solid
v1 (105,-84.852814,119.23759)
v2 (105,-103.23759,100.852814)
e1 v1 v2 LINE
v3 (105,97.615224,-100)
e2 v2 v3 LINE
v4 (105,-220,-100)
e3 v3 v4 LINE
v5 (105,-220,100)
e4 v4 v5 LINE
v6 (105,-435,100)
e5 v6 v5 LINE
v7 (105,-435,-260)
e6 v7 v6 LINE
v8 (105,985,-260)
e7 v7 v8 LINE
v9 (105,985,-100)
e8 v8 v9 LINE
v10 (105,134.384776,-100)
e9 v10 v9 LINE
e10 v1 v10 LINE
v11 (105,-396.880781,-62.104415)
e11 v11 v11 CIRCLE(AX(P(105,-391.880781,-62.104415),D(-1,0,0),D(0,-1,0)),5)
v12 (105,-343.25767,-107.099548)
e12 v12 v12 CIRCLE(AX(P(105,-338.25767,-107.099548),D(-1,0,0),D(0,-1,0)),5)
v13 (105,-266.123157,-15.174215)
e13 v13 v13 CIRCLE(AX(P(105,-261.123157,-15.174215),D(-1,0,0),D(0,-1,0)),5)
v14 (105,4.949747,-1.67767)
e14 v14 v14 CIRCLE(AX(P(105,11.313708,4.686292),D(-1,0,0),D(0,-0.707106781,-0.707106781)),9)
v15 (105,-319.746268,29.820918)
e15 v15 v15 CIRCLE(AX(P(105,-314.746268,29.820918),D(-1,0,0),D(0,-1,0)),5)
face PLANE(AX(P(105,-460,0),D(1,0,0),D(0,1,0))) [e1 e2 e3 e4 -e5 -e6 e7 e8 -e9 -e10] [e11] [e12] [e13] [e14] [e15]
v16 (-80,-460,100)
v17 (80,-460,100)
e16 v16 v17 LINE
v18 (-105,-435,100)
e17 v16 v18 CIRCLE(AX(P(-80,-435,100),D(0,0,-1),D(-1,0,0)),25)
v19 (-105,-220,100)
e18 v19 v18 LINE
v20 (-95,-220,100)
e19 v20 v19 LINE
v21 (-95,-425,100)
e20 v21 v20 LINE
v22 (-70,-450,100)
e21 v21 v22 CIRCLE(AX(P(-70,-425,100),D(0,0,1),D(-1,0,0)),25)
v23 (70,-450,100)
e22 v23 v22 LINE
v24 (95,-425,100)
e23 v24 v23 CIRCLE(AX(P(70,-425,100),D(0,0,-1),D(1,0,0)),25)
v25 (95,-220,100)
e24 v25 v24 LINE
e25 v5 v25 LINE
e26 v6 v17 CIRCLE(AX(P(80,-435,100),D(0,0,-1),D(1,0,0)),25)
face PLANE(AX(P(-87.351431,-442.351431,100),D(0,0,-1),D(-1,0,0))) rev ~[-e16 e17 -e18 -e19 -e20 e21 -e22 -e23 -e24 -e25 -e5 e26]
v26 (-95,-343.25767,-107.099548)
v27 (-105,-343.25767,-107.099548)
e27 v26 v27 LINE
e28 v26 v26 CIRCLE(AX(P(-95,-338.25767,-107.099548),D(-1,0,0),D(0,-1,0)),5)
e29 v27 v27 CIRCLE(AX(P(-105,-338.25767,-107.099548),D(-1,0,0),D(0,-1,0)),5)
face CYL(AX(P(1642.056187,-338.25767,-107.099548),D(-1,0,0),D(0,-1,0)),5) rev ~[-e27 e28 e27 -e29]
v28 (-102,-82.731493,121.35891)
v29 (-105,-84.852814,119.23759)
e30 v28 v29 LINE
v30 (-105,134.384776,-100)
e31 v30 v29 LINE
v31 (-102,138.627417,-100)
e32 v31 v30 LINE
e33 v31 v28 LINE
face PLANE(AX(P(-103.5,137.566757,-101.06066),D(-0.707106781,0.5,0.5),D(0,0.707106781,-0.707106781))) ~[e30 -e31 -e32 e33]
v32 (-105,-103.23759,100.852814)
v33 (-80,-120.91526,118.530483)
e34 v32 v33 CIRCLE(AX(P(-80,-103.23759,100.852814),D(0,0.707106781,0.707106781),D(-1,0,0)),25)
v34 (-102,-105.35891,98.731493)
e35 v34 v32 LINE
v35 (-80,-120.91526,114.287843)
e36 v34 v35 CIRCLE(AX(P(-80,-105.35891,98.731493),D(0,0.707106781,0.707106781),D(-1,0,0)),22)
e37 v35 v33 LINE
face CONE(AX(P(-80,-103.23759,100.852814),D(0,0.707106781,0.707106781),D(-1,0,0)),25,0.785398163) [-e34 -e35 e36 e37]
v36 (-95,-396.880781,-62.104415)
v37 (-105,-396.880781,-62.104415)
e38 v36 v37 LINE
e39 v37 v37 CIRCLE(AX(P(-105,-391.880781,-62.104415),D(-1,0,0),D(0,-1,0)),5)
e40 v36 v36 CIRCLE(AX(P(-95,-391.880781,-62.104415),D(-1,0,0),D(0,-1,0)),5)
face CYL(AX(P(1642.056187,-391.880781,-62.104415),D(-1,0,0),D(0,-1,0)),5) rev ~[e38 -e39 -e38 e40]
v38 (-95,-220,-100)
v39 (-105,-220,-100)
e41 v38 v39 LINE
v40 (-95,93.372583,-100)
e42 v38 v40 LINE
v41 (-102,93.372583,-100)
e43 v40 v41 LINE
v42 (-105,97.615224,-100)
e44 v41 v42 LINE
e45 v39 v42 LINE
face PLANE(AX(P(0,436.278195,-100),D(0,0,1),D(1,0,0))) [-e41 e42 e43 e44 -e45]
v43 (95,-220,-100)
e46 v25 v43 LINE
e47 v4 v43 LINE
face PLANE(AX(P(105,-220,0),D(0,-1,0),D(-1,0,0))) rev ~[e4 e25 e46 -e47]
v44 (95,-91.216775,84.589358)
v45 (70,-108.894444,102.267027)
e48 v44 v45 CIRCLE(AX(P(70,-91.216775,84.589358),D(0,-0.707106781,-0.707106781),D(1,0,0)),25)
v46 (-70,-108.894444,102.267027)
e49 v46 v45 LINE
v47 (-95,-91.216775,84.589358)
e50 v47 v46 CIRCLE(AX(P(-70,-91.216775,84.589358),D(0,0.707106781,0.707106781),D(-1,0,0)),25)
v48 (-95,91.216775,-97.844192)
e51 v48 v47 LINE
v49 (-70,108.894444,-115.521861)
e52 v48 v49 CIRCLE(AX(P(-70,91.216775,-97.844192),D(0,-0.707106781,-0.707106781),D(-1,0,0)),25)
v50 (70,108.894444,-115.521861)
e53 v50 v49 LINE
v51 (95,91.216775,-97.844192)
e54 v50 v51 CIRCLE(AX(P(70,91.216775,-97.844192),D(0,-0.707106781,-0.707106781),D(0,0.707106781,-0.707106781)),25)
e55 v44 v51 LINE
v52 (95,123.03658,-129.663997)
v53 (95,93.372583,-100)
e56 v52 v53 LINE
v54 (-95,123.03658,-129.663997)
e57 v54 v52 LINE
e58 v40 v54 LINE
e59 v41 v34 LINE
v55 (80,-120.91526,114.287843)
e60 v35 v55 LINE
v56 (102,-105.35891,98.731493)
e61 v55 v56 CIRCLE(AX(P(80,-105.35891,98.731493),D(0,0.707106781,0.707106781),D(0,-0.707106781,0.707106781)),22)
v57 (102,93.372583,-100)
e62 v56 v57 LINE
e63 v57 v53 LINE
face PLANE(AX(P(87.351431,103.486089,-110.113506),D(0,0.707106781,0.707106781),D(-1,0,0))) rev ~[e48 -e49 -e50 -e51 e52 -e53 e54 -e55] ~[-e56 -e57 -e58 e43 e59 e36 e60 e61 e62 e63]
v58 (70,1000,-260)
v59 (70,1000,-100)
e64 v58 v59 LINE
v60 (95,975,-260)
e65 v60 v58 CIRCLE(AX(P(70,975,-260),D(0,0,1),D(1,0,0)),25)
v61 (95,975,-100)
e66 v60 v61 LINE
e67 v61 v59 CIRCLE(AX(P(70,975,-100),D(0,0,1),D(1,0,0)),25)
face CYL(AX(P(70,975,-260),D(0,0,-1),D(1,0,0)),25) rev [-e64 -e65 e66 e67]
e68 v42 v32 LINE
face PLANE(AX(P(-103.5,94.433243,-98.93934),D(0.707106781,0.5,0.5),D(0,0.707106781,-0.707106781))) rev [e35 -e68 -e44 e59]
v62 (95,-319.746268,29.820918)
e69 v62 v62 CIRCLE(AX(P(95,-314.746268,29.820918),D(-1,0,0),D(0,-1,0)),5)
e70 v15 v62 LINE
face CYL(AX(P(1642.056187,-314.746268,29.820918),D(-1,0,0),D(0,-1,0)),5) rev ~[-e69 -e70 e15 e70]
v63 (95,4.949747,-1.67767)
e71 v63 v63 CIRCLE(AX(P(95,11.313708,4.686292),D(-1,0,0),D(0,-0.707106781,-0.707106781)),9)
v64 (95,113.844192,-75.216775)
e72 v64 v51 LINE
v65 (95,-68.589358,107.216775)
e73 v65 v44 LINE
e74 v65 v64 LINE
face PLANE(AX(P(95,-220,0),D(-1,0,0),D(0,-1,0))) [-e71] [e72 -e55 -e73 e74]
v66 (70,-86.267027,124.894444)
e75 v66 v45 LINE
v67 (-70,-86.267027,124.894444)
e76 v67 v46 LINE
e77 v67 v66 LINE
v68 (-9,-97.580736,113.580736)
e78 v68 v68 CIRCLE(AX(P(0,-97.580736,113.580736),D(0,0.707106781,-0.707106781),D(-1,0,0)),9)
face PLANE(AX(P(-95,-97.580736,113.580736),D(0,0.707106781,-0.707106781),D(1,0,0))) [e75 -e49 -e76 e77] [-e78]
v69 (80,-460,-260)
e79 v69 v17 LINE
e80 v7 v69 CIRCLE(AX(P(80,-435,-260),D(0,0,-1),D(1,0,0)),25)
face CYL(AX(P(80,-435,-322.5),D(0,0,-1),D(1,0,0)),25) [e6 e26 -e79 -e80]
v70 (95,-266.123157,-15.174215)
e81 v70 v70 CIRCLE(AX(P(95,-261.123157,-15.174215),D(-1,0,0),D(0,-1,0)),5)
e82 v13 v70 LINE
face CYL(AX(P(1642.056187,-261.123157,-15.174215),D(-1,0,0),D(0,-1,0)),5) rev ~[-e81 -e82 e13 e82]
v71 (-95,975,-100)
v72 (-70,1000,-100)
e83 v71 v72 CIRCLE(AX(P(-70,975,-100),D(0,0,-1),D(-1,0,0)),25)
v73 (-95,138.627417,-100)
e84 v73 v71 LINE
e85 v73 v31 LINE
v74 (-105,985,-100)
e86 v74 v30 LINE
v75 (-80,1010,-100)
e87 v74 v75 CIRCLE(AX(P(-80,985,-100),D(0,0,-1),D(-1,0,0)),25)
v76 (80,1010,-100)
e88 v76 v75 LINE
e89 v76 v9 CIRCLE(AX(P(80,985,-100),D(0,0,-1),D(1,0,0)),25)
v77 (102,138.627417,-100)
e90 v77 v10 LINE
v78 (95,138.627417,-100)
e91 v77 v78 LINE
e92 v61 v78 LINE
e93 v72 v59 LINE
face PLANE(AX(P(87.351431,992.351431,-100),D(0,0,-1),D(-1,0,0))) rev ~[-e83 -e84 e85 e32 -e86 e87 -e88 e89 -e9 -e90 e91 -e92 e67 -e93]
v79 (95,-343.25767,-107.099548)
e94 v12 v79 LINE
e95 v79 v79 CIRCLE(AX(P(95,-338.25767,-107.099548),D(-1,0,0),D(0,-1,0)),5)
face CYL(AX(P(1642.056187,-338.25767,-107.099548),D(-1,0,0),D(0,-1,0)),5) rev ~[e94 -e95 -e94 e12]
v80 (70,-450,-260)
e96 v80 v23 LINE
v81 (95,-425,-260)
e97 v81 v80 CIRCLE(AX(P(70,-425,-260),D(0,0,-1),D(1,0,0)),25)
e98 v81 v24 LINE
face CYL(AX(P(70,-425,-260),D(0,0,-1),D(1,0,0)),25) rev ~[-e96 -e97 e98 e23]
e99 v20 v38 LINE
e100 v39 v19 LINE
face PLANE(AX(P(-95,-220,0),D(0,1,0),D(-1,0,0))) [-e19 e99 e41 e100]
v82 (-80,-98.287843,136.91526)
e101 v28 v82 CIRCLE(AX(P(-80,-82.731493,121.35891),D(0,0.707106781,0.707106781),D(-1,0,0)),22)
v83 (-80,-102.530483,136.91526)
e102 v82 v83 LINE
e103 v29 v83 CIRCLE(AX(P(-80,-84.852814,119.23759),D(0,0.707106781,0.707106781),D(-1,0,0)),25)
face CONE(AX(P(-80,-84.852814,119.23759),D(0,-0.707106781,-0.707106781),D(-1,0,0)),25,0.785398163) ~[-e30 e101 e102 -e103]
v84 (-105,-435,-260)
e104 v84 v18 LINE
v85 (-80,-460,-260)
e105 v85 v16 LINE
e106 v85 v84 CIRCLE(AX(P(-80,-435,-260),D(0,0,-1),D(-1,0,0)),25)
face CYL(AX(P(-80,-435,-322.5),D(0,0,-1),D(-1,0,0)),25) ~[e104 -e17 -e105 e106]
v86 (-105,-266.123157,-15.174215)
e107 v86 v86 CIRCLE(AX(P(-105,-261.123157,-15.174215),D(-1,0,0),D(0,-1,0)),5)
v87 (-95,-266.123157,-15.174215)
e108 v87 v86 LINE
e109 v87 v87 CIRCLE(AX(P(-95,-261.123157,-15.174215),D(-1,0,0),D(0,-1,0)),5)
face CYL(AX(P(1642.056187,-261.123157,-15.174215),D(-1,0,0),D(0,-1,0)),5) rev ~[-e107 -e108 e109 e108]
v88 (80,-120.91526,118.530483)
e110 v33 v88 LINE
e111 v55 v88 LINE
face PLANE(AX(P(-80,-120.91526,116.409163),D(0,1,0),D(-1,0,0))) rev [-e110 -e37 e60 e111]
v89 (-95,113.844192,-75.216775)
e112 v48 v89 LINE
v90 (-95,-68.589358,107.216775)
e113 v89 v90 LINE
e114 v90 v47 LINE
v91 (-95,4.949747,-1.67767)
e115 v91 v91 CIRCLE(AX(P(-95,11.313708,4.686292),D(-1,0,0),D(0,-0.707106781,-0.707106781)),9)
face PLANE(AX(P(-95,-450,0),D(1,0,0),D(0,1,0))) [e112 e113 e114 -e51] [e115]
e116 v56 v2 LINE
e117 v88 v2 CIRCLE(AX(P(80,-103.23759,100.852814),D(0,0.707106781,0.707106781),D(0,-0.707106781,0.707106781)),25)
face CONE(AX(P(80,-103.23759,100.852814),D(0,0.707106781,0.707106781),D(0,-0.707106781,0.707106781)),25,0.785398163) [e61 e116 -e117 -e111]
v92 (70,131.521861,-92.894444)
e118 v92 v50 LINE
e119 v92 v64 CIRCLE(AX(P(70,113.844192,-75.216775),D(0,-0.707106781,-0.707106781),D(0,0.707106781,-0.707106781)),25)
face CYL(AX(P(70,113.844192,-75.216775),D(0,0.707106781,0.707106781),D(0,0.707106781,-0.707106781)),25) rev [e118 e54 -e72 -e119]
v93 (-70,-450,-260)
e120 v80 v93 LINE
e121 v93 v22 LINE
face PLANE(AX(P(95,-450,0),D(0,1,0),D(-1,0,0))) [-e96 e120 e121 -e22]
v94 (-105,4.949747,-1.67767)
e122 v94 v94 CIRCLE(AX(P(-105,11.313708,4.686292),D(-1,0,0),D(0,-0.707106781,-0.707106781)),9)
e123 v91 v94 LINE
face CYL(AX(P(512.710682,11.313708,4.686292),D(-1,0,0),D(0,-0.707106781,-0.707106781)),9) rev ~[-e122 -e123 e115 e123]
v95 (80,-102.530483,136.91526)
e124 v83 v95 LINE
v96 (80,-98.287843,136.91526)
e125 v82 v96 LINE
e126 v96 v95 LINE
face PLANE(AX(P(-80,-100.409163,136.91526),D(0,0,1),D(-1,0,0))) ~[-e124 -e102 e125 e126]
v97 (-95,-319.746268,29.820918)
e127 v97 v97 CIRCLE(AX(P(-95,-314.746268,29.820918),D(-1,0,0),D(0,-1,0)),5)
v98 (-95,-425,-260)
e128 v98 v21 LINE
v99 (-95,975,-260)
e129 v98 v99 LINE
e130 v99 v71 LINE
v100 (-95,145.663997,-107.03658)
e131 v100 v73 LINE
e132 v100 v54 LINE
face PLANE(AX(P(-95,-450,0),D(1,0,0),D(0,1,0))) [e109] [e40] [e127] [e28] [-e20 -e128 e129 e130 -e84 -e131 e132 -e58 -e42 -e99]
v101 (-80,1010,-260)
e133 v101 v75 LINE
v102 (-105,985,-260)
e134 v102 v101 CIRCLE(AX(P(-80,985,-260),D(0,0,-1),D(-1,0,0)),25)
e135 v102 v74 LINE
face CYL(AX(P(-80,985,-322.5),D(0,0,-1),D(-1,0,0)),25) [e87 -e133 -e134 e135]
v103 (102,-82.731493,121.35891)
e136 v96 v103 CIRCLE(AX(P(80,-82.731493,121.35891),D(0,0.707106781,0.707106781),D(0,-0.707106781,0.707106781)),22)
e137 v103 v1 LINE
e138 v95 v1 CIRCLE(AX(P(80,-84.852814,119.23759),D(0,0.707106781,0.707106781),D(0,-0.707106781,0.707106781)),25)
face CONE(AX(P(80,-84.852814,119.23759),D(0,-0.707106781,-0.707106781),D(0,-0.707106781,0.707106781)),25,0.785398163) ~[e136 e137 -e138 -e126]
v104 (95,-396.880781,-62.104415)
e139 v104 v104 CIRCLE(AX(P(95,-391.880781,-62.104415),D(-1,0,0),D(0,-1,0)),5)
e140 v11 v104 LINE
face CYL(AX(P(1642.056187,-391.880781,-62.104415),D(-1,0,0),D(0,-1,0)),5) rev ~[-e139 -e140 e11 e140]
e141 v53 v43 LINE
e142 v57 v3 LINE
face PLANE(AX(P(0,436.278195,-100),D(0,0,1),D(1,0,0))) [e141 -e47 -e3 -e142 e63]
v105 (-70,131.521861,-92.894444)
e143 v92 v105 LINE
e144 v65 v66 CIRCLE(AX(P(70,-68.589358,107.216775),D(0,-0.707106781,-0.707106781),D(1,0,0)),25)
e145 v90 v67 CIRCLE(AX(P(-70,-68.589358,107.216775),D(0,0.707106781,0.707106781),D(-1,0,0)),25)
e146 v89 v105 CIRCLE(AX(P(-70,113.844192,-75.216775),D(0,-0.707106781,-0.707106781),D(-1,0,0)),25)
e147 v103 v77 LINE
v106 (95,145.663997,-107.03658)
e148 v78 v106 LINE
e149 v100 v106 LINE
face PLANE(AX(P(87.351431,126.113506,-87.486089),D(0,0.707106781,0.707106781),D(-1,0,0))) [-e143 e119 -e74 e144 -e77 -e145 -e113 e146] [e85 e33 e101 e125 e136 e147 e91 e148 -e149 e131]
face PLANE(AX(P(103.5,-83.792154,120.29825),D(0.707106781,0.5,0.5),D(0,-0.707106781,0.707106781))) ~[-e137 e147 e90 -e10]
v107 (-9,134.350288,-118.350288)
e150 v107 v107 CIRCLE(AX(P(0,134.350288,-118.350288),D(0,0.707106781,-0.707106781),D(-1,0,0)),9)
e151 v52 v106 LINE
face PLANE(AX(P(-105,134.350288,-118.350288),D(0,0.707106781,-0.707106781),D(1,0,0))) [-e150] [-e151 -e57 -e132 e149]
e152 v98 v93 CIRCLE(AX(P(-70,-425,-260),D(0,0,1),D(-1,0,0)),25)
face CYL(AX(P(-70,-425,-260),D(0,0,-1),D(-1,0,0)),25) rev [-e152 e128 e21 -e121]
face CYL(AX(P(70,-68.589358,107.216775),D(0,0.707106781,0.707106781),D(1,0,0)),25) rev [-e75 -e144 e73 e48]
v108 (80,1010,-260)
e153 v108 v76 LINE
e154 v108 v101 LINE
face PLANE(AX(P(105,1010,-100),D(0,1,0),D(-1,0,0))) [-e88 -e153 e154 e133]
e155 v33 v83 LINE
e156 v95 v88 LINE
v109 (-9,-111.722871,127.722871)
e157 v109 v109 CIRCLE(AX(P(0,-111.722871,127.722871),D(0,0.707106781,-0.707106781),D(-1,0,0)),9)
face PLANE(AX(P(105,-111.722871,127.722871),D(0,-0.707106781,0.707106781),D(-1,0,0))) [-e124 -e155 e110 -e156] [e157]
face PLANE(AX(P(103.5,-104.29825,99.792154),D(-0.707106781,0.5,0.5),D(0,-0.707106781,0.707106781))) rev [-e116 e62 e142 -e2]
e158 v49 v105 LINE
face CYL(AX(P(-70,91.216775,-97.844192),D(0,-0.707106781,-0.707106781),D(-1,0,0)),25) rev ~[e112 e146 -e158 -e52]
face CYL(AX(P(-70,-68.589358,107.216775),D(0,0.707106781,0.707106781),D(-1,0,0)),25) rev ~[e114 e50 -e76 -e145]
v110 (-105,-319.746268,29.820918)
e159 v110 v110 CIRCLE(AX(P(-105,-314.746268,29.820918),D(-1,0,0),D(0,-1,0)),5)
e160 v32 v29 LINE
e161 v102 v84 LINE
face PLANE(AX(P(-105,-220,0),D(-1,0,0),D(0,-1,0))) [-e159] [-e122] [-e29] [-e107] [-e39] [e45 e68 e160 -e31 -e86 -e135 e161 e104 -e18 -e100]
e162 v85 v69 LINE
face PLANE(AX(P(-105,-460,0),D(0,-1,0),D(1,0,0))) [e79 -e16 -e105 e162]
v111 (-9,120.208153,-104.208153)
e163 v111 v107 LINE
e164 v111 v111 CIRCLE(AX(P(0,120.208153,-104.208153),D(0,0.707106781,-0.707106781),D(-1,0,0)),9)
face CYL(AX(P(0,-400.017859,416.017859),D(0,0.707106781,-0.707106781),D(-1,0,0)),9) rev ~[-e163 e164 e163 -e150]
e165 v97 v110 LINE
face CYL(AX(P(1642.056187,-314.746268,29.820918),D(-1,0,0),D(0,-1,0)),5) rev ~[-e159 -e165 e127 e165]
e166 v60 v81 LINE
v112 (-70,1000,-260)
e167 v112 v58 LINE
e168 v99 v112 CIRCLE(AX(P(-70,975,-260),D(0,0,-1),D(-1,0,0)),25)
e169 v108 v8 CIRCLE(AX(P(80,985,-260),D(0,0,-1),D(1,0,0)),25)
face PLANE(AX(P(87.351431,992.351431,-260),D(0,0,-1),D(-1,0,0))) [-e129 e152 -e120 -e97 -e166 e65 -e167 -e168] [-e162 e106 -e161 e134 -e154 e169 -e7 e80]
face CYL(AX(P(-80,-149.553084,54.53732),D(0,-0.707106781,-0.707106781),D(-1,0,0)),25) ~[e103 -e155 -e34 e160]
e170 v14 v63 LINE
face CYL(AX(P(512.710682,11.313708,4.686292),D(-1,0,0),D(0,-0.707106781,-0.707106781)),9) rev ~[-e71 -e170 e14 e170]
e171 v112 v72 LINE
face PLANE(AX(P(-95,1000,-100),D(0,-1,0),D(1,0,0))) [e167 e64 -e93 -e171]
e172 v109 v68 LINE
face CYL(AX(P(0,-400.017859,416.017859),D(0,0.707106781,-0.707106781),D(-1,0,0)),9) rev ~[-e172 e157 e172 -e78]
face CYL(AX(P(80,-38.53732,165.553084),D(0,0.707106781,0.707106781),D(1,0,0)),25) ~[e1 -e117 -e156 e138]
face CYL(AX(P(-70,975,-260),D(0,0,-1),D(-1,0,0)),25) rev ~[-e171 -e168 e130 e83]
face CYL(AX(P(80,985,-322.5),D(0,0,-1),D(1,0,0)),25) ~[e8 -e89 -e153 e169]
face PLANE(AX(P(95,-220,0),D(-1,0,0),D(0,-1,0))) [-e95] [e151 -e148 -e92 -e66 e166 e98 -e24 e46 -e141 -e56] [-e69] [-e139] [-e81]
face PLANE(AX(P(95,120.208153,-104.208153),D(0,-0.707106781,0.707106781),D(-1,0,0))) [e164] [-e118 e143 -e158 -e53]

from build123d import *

# Parameters (mm, degrees)
F1_DEPTH      = 16
F3_D          = 18
F5_D          = 18
F6_ANGLE      = 45
F8_START      = -100
F8_DEPTH      = 160
F9_DEPTH      = 100
F9_DEPTH_BACK = 100
F10_T1_DEPTH  = 32
F10_T3_DEPTH  = 32
F10_T5_DEPTH  = 360
F10_T7_DEPTH  = 160
F10_T9_DEPTH  = 157
F10_T11_DEPTH = 157
F10_T13_DEPTH = 485
F10_T15_DEPTH = 285
F11_SIZE      = 3
F13_D         = 10


# Not quite as in the source:
# - a fillet or chamfer that OpenCascade refuses, or shapes differently, is made with other operations: its cross-section is extruded or revolved along the edge and cut away or added


with BuildPart() as f1:
    # F0 (on Front) → F1 (new body, symmetric)
    with BuildSketch(Plane.XZ):
        Polygon((-95, 16), (-105, 16), (-105, -16), (-105, -174), (105, -174), (105, -16), (105, 16), (95, 16), (95, -16), (95, -154), (-95, -154), (-95, -16), align=None)
        Polygon((-105, 174), (-105, 16), (-95, 16), (-95, 154), (95, 154), (95, 16), (105, 16), (105, 174), align=None)
    extrude(amount=F1_DEPTH, both=True)

    # F3 (through all)
    with Locations(Plane.YZ.offset(105)):
        with Locations((0, 0)):
            Hole(F3_D / 2)

    # F5 (through all)
    with Locations(Plane.XY.offset(174)):
        with Locations((0, 0)):
            Hole(F5_D / 2)


with BuildPart() as f1_1:
    # F6: moved
    add(f1.part.rotate(Axis((0, 0, 16), (1, 0, 0)), F6_ANGLE))

    # F7 (on Top) → F8 (join)
    with BuildSketch(Plane.XY.offset(F8_START)):
        Polygon((0, 1010), (-105, 1010), (-105, -220), (-95, -220), (-95, 1000), (0, 1000), (95, 1000), (95, -220), (105, -220), (105, 1010), align=None)
        Polygon((-95, -220), (-105, -220), (-105, -460), (0, -460), (105, -460), (105, -220), (95, -220), (95, -450), (0, -450), (-95, -450), align=None)
    extrude(amount=-F8_DEPTH)

    # F7 (on Top) → F9 (join, two sides)
    with BuildSketch(Plane.XY) as f9_sk:
        Polygon((-95, -220), (-105, -220), (-105, -460), (0, -460), (105, -460), (105, -220), (95, -220), (95, -450), (0, -450), (-95, -450), align=None)
    extrude(amount=F9_DEPTH)
    extrude(f9_sk.sketch, amount=-F9_DEPTH_BACK)

    # F10: fillet of radius 25 on 14 edges, made by hand

    # F10_s2 → F10_t1 (join)
    with BuildSketch(Plane(origin=(0, -3.313708499, -3.313708499), x_dir=(1, 0, 0), z_dir=(0, 0.7071067812, 0.7071067812))):
        with BuildLine():
            ThreePointArc((-95, 133.686291501), (-87.6776695297, 151.3639610307), (-70, 158.686291501))
            Line((-70, 158.686291501), (-95, 158.686291501))
            Line((-95, 158.686291501), (-95, 133.686291501))
        make_face()
    extrude(amount=F10_T1_DEPTH)

    # F10_s4 → F10_t3 (join)
    with BuildSketch(Plane(origin=(0, 19.313708499, 19.313708499), x_dir=(1, 0, 0), z_dir=(0, -0.7071067812, -0.7071067812))):
        with BuildLine():
            ThreePointArc((70, -158.686291501), (87.6776695297, -151.3639610307), (95, -133.686291501))
            Line((95, -133.686291501), (95, -158.686291501))
            Line((95, -158.686291501), (70, -158.686291501))
        make_face()
        with BuildLine():
            ThreePointArc((95, 124.313708499), (87.6776695297, 141.9913780286), (70, 149.313708499))
            Line((70, 149.313708499), (95, 149.313708499))
            Line((95, 149.313708499), (95, 124.313708499))
        make_face()
        with BuildLine():
            ThreePointArc((-95, 124.313708499), (-87.6776695297, 141.9913780286), (-70, 149.313708499))
            Line((-70, 149.313708499), (-95, 149.313708499))
            Line((-95, 149.313708499), (-95, 124.313708499))
        make_face()
    extrude(amount=F10_T3_DEPTH)

    # F10_s6 → F10_t5 (join)
    with BuildSketch(Plane.XY.offset(-260)):
        with BuildLine():
            ThreePointArc((-95, -425), (-87.6776695297, -442.6776695297), (-70, -450))
            Line((-70, -450), (-95, -450))
            Line((-95, -450), (-95, -425))
        make_face()
        with BuildLine():
            ThreePointArc((95, -425), (87.6776695297, -442.6776695297), (70, -450))
            Line((70, -450), (95, -450))
            Line((95, -450), (95, -425))
        make_face()
    extrude(amount=F10_T5_DEPTH)

    # F10_s8 → F10_t7 (join)
    with BuildSketch(Plane.XY.offset(-260)):
        with BuildLine():
            ThreePointArc((95, 975), (87.6776695297, 992.6776695297), (70, 1000))
            Line((70, 1000), (95, 1000))
            Line((95, 1000), (95, 975))
        make_face()
        with BuildLine():
            ThreePointArc((-95, 975), (-87.6776695297, 992.6776695297), (-70, 1000))
            Line((-70, 1000), (-95, 1000))
            Line((-95, 1000), (-95, 975))
        make_face()
    extrude(amount=F10_T7_DEPTH)

    # F10_s10 → F10_t9 (cut)
    with BuildSketch(Plane(origin=(0, 63.5078823231, 63.5078823231), x_dir=(1, 0, 0), z_dir=(0, -0.7071067812, -0.7071067812))):
        with BuildLine():
            ThreePointArc((105, 144.313708499), (97.6776695297, 161.9913780286), (80, 169.313708499))
            Line((80, 169.313708499), (105, 169.313708499))
            Line((105, 169.313708499), (105, 144.313708499))
        make_face()
    extrude(amount=F10_T9_DEPTH, mode=Mode.SUBTRACT)

    # F10_s12 → F10_t11 (cut)
    with BuildSketch(Plane(origin=(0, -47.5078823231, -47.5078823231), x_dir=(1, 0, 0), z_dir=(0, 0.7071067812, 0.7071067812))):
        with BuildLine():
            ThreePointArc((-105, -144.313708499), (-97.6776695297, -161.9913780286), (-80, -169.313708499))
            Line((-80, -169.313708499), (-105, -169.313708499))
            Line((-105, -169.313708499), (-105, -144.313708499))
        make_face()
    extrude(amount=F10_T11_DEPTH, mode=Mode.SUBTRACT)

    # F10_s14 → F10_t13 (cut)
    with BuildSketch(Plane.XY.offset(-322.5)):
        with BuildLine():
            ThreePointArc((-105, -435), (-97.6776695297, -452.6776695297), (-80, -460))
            Line((-80, -460), (-105, -460))
            Line((-105, -460), (-105, -435))
        make_face()
        with BuildLine():
            ThreePointArc((105, -435), (97.6776695297, -452.6776695297), (80, -460))
            Line((80, -460), (105, -460))
            Line((105, -460), (105, -435))
        make_face()
    extrude(amount=F10_T13_DEPTH, mode=Mode.SUBTRACT)

    # F10_s16 → F10_t15 (cut)
    with BuildSketch(Plane.XY.offset(-322.5)):
        with BuildLine():
            ThreePointArc((105, 985), (97.6776695297, 1002.6776695297), (80, 1010))
            Line((80, 1010), (105, 1010))
            Line((105, 1010), (105, 985))
        make_face()
        with BuildLine():
            ThreePointArc((-105, 985), (-97.6776695297, 1002.6776695297), (-80, 1010))
            Line((-80, 1010), (-105, 1010))
            Line((-105, 1010), (-105, 985))
        make_face()
    extrude(amount=F10_T15_DEPTH, mode=Mode.SUBTRACT)

    # F11
    f11_edges = [f1_1.edges().sort_by_distance(p)[0] for p in [
        (97.67767, -95.231493, 133.85891),
        (97.67767, -117.85891, 111.231493),
    ]]
    chamfer(f11_edges, length=F11_SIZE)

    # F13 (through all)
    with Locations(Plane.YZ.offset(105)):
        with Locations((-314.7462682585, 29.8209178701), (-261.1231572401, -15.1742148079), (-338.2576704025, -107.0995479822), (-391.8807814209, -62.1044153042)):
            Hole(F13_D / 2)


solid = f1_1.part
